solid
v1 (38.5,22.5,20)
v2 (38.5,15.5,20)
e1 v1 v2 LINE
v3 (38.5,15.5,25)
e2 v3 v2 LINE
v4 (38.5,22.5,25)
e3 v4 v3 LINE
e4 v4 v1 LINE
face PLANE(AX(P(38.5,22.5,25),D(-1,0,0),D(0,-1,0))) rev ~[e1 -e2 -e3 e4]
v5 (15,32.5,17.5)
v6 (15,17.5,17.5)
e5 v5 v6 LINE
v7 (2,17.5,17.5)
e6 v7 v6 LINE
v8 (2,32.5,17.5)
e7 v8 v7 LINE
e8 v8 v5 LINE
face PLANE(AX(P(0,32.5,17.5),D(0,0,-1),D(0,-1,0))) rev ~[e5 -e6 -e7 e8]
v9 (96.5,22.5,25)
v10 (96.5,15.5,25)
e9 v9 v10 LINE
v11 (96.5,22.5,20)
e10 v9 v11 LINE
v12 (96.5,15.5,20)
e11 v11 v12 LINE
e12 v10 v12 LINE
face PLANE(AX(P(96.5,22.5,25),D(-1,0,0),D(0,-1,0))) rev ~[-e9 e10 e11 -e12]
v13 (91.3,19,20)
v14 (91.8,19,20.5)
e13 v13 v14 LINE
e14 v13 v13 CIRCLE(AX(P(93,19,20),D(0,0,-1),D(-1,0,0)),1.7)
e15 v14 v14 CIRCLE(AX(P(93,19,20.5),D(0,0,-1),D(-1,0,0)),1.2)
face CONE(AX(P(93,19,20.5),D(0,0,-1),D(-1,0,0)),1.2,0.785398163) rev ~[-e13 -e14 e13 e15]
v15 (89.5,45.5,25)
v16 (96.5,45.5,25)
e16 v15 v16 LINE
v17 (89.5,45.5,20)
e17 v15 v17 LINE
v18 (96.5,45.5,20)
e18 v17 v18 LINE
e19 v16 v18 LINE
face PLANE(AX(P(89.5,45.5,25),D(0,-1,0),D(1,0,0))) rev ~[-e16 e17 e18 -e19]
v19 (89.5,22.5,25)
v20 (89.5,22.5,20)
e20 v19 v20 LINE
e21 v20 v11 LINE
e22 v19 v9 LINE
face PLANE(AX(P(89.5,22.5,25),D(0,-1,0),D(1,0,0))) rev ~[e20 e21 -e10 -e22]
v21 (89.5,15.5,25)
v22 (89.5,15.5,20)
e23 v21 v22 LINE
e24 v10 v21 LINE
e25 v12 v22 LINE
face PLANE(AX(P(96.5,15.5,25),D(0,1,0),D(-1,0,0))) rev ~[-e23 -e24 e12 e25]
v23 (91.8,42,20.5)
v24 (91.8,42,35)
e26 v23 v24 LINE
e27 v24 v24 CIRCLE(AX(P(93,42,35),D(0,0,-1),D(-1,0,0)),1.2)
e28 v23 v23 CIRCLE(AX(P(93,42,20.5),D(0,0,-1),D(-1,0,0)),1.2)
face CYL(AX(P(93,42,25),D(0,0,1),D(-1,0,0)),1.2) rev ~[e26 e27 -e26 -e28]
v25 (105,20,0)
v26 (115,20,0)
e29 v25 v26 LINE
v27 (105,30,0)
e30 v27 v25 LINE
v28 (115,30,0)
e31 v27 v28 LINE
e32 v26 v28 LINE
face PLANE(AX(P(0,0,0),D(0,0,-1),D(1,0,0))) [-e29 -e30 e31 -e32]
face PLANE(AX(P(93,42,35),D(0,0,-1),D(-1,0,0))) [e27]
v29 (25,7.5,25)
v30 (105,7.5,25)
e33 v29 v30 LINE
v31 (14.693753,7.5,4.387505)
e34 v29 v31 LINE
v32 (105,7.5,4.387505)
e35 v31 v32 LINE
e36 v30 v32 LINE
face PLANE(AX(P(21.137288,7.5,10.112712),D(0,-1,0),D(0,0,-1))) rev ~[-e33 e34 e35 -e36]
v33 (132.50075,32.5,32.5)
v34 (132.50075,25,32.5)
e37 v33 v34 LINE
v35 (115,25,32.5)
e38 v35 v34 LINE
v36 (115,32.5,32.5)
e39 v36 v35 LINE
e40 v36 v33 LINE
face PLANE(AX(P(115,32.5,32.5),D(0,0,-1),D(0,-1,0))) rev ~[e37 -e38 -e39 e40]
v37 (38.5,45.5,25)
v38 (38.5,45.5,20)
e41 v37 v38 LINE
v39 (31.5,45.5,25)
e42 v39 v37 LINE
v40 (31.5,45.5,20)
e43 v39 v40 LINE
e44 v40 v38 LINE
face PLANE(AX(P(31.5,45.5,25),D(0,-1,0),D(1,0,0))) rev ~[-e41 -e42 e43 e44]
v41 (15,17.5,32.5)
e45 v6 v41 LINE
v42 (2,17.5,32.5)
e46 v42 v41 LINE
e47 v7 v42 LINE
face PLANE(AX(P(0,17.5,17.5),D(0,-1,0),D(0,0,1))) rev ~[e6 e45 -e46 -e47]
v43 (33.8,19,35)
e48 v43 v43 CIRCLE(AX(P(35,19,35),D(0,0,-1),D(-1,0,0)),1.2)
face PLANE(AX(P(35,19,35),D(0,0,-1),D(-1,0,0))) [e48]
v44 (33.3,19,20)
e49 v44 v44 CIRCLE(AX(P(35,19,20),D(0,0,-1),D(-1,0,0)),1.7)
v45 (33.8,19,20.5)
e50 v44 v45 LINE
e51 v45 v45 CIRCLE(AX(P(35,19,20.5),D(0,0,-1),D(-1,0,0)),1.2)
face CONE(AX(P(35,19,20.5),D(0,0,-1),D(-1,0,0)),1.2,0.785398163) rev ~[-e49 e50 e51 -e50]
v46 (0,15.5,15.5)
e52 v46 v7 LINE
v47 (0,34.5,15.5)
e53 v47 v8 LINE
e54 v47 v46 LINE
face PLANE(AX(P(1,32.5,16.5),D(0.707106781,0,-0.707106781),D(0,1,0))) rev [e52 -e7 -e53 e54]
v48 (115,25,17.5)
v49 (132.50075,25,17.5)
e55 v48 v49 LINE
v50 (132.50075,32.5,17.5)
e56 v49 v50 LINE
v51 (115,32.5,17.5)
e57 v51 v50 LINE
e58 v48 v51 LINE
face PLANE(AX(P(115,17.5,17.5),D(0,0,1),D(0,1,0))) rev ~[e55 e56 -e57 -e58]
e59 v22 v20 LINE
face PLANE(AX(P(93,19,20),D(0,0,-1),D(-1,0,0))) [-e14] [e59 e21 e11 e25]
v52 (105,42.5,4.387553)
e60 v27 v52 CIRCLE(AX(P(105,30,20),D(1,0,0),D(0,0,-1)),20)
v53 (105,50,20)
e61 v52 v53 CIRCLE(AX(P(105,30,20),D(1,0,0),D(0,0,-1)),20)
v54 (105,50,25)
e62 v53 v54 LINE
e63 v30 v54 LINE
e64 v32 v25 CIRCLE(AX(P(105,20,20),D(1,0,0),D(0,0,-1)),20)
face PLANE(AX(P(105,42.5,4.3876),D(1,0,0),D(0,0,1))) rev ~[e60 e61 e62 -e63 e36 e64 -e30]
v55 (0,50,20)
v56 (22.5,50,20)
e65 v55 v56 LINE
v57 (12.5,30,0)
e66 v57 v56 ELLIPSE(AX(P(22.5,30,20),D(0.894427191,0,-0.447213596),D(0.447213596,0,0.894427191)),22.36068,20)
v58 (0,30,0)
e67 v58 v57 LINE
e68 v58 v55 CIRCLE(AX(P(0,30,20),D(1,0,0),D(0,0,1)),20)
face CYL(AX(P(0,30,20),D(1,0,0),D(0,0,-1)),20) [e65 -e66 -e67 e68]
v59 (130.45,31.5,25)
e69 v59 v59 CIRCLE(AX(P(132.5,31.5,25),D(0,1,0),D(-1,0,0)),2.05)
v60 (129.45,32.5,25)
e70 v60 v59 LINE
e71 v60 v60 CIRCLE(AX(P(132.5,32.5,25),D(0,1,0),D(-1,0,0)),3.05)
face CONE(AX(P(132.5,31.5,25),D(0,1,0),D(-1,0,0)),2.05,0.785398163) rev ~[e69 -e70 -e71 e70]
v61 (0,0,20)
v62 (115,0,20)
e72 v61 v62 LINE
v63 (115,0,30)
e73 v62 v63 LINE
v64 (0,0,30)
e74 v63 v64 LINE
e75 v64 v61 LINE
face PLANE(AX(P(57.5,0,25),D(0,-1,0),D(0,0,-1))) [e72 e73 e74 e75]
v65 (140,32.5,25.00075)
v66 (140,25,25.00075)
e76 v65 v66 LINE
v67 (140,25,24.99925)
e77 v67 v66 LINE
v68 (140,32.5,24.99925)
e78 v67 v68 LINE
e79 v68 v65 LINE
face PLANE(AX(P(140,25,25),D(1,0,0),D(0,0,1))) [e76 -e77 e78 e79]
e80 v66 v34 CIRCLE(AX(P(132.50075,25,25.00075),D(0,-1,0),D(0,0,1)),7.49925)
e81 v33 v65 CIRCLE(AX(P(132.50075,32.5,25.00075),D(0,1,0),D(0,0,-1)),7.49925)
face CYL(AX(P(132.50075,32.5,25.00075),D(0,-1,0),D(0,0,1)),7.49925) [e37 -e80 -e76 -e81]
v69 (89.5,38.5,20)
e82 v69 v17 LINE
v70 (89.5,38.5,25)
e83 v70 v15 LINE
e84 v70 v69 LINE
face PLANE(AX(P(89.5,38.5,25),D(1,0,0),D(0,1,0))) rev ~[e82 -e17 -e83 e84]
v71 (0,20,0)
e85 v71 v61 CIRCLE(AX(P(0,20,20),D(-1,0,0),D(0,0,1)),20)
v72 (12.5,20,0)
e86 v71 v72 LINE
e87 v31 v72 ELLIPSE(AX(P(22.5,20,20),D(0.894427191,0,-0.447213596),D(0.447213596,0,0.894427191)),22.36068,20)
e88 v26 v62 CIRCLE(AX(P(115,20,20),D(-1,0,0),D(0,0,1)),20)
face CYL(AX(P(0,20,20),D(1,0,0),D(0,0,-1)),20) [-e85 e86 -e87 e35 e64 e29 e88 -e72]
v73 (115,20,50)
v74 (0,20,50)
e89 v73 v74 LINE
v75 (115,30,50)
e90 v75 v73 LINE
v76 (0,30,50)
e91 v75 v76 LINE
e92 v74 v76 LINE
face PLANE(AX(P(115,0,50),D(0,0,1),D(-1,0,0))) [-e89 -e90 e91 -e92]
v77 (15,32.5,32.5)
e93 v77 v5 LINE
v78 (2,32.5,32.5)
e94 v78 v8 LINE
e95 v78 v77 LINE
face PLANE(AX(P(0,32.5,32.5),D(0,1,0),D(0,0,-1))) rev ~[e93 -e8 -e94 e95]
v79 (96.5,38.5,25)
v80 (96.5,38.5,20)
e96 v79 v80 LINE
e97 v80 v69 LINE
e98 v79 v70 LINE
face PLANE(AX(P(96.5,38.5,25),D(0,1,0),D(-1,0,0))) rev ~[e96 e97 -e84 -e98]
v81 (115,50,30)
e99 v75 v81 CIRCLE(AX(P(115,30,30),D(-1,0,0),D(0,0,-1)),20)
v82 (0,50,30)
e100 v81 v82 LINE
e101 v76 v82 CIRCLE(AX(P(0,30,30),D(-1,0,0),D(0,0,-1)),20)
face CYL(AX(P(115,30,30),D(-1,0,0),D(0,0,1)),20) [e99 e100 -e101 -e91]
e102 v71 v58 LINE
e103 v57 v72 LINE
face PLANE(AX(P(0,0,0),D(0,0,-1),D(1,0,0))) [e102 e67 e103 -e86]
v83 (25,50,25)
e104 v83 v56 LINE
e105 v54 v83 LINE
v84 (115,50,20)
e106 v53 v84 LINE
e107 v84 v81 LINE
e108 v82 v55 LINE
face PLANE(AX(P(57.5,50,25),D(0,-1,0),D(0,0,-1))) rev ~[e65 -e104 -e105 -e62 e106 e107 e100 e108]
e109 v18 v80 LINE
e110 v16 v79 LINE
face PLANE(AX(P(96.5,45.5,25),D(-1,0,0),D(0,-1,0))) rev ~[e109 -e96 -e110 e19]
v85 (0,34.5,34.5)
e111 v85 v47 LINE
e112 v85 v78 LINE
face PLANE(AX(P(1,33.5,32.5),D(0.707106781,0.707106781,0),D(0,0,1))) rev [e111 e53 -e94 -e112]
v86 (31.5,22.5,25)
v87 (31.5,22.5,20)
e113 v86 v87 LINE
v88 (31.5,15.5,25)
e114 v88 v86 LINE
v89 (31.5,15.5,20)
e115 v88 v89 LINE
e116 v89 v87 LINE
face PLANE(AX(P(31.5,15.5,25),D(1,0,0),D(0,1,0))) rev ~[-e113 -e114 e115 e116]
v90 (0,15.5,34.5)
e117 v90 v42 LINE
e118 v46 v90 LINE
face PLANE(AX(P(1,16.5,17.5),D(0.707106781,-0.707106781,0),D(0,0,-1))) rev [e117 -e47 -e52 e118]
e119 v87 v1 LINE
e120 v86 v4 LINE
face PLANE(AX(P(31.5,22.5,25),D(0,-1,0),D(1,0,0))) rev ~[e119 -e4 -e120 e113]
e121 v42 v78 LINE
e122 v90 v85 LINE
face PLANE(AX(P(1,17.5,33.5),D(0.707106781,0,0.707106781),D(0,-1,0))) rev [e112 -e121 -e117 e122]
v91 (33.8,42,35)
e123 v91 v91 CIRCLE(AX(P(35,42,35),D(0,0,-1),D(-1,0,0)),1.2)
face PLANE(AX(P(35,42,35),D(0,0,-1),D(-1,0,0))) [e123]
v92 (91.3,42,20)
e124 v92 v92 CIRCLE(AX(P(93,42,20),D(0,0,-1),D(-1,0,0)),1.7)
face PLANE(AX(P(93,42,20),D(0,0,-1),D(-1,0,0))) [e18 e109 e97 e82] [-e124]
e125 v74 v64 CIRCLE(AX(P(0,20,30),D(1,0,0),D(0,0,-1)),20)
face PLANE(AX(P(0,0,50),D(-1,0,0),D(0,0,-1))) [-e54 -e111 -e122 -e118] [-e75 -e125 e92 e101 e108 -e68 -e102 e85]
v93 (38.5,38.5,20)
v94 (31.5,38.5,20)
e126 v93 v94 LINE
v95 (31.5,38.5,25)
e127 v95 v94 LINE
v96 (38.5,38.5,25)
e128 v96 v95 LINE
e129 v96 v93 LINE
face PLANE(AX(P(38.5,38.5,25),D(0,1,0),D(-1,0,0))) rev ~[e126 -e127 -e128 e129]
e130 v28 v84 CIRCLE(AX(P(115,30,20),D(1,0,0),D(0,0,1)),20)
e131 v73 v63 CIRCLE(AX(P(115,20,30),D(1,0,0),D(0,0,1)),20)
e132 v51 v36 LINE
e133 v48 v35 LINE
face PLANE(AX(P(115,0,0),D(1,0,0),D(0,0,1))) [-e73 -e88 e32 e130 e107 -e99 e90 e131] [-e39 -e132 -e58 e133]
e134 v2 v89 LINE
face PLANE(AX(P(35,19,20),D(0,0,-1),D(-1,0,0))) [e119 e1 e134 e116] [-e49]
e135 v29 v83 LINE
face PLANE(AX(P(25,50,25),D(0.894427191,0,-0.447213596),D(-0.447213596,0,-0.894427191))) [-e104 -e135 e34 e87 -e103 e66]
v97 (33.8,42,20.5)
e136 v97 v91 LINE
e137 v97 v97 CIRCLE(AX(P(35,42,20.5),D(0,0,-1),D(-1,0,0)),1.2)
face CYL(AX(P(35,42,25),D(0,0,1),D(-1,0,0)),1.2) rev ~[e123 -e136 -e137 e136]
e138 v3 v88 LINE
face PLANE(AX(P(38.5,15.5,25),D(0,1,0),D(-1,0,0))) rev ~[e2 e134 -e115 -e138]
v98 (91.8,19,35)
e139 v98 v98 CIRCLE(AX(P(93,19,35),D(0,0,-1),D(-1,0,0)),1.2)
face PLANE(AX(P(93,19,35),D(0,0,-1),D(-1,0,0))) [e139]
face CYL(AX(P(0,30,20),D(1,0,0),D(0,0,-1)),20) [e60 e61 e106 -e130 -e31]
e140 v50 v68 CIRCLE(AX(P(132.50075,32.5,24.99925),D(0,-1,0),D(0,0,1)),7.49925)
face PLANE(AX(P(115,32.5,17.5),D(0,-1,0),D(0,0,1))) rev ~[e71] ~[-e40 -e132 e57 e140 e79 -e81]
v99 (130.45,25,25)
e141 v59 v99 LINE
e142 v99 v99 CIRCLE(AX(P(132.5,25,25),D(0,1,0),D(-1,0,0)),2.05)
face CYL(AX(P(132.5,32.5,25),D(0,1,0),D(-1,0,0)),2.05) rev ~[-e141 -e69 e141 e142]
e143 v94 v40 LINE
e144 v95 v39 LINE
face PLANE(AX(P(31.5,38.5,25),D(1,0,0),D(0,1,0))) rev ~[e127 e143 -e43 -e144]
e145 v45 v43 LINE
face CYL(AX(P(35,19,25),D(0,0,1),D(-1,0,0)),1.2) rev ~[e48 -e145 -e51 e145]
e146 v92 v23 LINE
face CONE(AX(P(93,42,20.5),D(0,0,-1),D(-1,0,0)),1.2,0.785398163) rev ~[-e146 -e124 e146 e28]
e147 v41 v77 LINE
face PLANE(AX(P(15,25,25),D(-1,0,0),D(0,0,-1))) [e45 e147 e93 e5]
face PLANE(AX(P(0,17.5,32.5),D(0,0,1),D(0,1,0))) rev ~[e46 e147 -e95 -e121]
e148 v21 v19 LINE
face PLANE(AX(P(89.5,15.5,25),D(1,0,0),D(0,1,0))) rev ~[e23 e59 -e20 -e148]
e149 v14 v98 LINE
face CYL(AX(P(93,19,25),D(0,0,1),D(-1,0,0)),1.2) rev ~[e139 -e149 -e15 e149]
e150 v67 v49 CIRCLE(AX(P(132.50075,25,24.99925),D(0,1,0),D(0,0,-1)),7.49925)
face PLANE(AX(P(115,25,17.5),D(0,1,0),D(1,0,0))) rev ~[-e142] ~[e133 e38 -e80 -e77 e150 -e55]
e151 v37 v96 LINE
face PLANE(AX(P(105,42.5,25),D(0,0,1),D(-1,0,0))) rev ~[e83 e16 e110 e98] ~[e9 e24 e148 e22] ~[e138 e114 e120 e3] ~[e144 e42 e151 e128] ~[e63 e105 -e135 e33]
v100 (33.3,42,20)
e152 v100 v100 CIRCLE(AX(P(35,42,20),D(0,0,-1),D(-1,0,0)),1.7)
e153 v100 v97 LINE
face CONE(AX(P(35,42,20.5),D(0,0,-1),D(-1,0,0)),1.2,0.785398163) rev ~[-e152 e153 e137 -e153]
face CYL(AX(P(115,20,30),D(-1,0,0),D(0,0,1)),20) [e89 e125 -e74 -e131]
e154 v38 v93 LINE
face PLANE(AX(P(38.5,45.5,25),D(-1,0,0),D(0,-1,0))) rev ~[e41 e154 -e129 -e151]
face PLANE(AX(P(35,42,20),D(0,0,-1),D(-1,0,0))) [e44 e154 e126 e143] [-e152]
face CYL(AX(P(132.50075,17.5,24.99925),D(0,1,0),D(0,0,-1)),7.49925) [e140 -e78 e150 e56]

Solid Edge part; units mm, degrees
sketch "Sketch1" plane through (0, 0, 0) normal (0, -1, 0) x (1, 0, 0)
  line L0 (0, 0) -> (115, 0)
  line L1 (115, 0) -> (115, 50)
  line L2 (115, 50) -> (0, 50)
  line L3 (0, 50) -> (0, 0)
  dimension "D1" = 50
  dimension "D2" = 50
  dimension "D3" = 115
extrude "Protrusion1" add sketch "Sketch1" against normal blind 50
fillet "Verrundung_2" radius 20 4 edges at (57.5, 50, 50) (57.5, 50, 0) (57.5, 0, 50) (57.5, 0, 0)
sketch "Sketch2" plane through (0, 25, 25) normal (-1, 0, 0) x (0, 0, -1)
  line L0 (-7.5, -7.5) -> (7.5, -7.5)
  line L1 (7.5, -7.5) -> (7.5, 7.5)
  line L2 (7.5, 7.5) -> (-7.5, 7.5)
  line L3 (-7.5, 7.5) -> (-7.5, -7.5)
  dimension "D1" = 15
extrude "Extrusionsausschnitt_5" cut sketch "Sketch2" against normal blind 15
chamfer "Fase_3" distance 2 angle 45 4 edges at (0, 25, 32.5) (0, 17.5, 25) (0, 25, 17.5) (0, 32.5, 25)
sketch "Sketch3" plane through (115, 25, 25) normal (1, 0, 0) x (0, 1, 0)
  line L0 (-7.5, -7.5) -> (7.5, -7.5)
  line L1 (7.5, -7.5) -> (7.5, 7.5)
  line L2 (7.5, 7.5) -> (-7.5, 7.5)
  line L3 (-7.5, 7.5) -> (-7.5, -7.5)
  dimension "D1" = 15
extrude "Extrusionsausprägung_2" add sketch "Sketch3" along normal blind 25
sketch "Sketch4" plane through (57.5, 25, 0) normal (0, 0, -1) x (-1, 0, 0)
  line L0 (-47.5, -17.5) -> (32.5, -17.5)
  line L1 (32.5, -17.5) -> (32.5, 17.5)
  line L2 (32.5, 17.5) -> (-47.5, 17.5)
  line L3 (-47.5, 17.5) -> (-47.5, -17.5)
  dimension "D1" = 35
  dimension "D2" = 80
  dimension "D3" = 10
extrude "Extrusionsausschnitt_6" cut sketch "Sketch4" against normal blind 20
sketch "Sketch5" plane through (65, 25, 20) normal (0, 0, -1) x (-1, 0, 0)
  line L0 (-40, 17.5) -> (40, 17.5)
  line L1 (40, 17.5) -> (40, -17.5)
  line L2 (40, -17.5) -> (-40, -17.5)
  line L3 (-40, -17.5) -> (-40, 17.5)
  line L4 (-34.5, 7) -> (-25.5, 7)
  line L5 (-25.5, 7) -> (-25.5, 16)
  line L6 (-25.5, 16) -> (-34.5, 16)
  line L7 (-34.5, 16) -> (-34.5, 7)
  line L8 (-34.5, -16) -> (-25.5, -16)
  line L9 (-25.5, -16) -> (-25.5, -7)
  line L10 (-25.5, -7) -> (-34.5, -7)
  line L11 (-34.5, -7) -> (-34.5, -16)
  line L12 (23.5, 7) -> (32.5, 7)
  line L13 (32.5, 7) -> (32.5, 16)
  line L14 (32.5, 16) -> (23.5, 16)
  line L15 (23.5, 16) -> (23.5, 7)
  line L16 (23.5, -16) -> (32.5, -16)
  line L17 (32.5, -16) -> (32.5, -7)
  line L18 (32.5, -7) -> (23.5, -7)
  line L19 (23.5, -7) -> (23.5, -16)
  dimension "D1" = 9
extrude "Extrusionsausschnitt_8" cut sketch "Sketch5" against normal blind 5
sketch "Sketch6" plane through (65, 42.5, 14.6938) normal (0, -1, 0) x (-1, 0, 0)
  line L0 (-40, -10.3062) -> (40, -10.3062)
  line L1 (40, -10.3062) -> (40, 10.3062)
  line L2 (40, 10.3062) -> (-40, 10.3062)
  line L3 (-40, 10.3062) -> (-40, -10.3062)
extrude "Extrusionsausschnitt_9" cut sketch "Sketch6" against normal blind 12
sketch "Sketch7" plane through (57.5, 50, 25) normal (0, 1, 0) x (-1, 0, 0)
  line L0 (32.5, 0) -> (45, -25)
  line L1 (45, -25) -> (32.5, -25)
  line L2 (32.5, -25) -> (32.5, 0)
extrude "Cutout1" cut sketch "Sketch7" against normal up to vertex (42.5 mm away)
fillet "Verrundung_3" radius 7.5 2 edges at (140, 25, 17.5) (140, 25, 32.5)
sketch "Sketch8" plane through (127.5, 32.5, 25) normal (0, 1, 0) x (-1, 0, 0)
  circle A0 centre (-5, 0) radius 2.05
  dimension "D1" = 4.1
extrude "Cutout2" cut sketch "Sketch8" against normal through all
chamfer "Fase_4" distance 1 angle 45 2 edges at (134.55, 32.5, 25) (132.5, 17.5, 22.95)
sketch "Sketch9" plane through (123.75, 25, 17.5) normal (0, 0, -1) x (-1, 0, 0)
  line L0 (8.75, -7.5) -> (8.75, 0)
  line L1 (8.75, 0) -> (-16.25, 0)
  line L2 (-16.25, 0) -> (-16.25, -7.5)
  line L3 (-16.25, -7.5) -> (8.75, -7.5)
extrude "Cutout3" cut sketch "Sketch9" against normal through all
sketch "Sketch10" plane through (95, 36.5, 20) normal (0, 0, -1) x (-1, 0, 0)
  line L0 (-4.5, 4.5) -> (62.5, 4.5)
  line L1 (62.5, 4.5) -> (62.5, -27.5)
  line L2 (62.5, -27.5) -> (-4.5, -27.5)
  line L3 (-4.5, -27.5) -> (-4.5, 4.5)
extrude "Cutout4" cut sketch "Sketch10" against normal up to vertex (5 mm away)
sketch "Sketch11" plane through (65, 28.75, 25) normal (0, 0, -1) x (-1, 0, 0)
  circle A0 centre (30, 13.25) radius 1.2
  circle A1 centre (-28, 13.25) radius 1.2
  circle A2 centre (-28, -9.75) radius 1.2
  circle A3 centre (30, -9.75) radius 1.2
  dimension "D1" = 2.4
  dimension "D2" = 58
  dimension "D3" = 23
  dimension "D4" = 10
  dimension "D5" = 8
extrude "Extrusionsausschnitt_14" cut sketch "Sketch11" against normal blind 10
sketch "Sketch12" plane through (65, 28.75, 25) normal (0, 0, -1) x (-1, 0, 0)
  line L0 (-31.5, 9.75) -> (-24.5, 9.75)
  line L1 (-24.5, 9.75) -> (-24.5, 16.75)
  line L2 (-24.5, 16.75) -> (-31.5, 16.75)
  line L3 (-31.5, 16.75) -> (-31.5, 9.75)
  line L4 (-31.5, -13.25) -> (-24.5, -13.25)
  line L5 (-24.5, -13.25) -> (-24.5, -6.25)
  line L6 (-24.5, -6.25) -> (-31.5, -6.25)
  line L7 (-31.5, -6.25) -> (-31.5, -13.25)
  line L8 (26.5, -13.25) -> (33.5, -13.25)
  line L9 (33.5, -13.25) -> (33.5, -6.25)
  line L10 (33.5, -6.25) -> (26.5, -6.25)
  line L11 (26.5, -6.25) -> (26.5, -13.25)
  line L12 (26.5, 9.75) -> (33.5, 9.75)
  line L13 (33.5, 9.75) -> (33.5, 16.75)
  line L14 (33.5, 16.75) -> (26.5, 16.75)
  line L15 (26.5, 16.75) -> (26.5, 9.75)
  circle A0 centre (-28, 13.25) radius 1.2
  circle A1 centre (-28, -9.75) radius 1.2
  circle A2 centre (30, -9.75) radius 1.2
  circle A3 centre (30, 13.25) radius 1.2
  dimension "D1" = 7
extrude "Extrusionsausprägung_3" add sketch "Sketch12" along normal blind 5
chamfer "Fase_5" distance 0.5 angle 45 4 edges at (94.2, 42, 20) (94.2, 19, 20) (36.2, 19, 20) (36.2, 42, 20)
properties part number "A6.A1.2" material "Nylon, allgemein"
